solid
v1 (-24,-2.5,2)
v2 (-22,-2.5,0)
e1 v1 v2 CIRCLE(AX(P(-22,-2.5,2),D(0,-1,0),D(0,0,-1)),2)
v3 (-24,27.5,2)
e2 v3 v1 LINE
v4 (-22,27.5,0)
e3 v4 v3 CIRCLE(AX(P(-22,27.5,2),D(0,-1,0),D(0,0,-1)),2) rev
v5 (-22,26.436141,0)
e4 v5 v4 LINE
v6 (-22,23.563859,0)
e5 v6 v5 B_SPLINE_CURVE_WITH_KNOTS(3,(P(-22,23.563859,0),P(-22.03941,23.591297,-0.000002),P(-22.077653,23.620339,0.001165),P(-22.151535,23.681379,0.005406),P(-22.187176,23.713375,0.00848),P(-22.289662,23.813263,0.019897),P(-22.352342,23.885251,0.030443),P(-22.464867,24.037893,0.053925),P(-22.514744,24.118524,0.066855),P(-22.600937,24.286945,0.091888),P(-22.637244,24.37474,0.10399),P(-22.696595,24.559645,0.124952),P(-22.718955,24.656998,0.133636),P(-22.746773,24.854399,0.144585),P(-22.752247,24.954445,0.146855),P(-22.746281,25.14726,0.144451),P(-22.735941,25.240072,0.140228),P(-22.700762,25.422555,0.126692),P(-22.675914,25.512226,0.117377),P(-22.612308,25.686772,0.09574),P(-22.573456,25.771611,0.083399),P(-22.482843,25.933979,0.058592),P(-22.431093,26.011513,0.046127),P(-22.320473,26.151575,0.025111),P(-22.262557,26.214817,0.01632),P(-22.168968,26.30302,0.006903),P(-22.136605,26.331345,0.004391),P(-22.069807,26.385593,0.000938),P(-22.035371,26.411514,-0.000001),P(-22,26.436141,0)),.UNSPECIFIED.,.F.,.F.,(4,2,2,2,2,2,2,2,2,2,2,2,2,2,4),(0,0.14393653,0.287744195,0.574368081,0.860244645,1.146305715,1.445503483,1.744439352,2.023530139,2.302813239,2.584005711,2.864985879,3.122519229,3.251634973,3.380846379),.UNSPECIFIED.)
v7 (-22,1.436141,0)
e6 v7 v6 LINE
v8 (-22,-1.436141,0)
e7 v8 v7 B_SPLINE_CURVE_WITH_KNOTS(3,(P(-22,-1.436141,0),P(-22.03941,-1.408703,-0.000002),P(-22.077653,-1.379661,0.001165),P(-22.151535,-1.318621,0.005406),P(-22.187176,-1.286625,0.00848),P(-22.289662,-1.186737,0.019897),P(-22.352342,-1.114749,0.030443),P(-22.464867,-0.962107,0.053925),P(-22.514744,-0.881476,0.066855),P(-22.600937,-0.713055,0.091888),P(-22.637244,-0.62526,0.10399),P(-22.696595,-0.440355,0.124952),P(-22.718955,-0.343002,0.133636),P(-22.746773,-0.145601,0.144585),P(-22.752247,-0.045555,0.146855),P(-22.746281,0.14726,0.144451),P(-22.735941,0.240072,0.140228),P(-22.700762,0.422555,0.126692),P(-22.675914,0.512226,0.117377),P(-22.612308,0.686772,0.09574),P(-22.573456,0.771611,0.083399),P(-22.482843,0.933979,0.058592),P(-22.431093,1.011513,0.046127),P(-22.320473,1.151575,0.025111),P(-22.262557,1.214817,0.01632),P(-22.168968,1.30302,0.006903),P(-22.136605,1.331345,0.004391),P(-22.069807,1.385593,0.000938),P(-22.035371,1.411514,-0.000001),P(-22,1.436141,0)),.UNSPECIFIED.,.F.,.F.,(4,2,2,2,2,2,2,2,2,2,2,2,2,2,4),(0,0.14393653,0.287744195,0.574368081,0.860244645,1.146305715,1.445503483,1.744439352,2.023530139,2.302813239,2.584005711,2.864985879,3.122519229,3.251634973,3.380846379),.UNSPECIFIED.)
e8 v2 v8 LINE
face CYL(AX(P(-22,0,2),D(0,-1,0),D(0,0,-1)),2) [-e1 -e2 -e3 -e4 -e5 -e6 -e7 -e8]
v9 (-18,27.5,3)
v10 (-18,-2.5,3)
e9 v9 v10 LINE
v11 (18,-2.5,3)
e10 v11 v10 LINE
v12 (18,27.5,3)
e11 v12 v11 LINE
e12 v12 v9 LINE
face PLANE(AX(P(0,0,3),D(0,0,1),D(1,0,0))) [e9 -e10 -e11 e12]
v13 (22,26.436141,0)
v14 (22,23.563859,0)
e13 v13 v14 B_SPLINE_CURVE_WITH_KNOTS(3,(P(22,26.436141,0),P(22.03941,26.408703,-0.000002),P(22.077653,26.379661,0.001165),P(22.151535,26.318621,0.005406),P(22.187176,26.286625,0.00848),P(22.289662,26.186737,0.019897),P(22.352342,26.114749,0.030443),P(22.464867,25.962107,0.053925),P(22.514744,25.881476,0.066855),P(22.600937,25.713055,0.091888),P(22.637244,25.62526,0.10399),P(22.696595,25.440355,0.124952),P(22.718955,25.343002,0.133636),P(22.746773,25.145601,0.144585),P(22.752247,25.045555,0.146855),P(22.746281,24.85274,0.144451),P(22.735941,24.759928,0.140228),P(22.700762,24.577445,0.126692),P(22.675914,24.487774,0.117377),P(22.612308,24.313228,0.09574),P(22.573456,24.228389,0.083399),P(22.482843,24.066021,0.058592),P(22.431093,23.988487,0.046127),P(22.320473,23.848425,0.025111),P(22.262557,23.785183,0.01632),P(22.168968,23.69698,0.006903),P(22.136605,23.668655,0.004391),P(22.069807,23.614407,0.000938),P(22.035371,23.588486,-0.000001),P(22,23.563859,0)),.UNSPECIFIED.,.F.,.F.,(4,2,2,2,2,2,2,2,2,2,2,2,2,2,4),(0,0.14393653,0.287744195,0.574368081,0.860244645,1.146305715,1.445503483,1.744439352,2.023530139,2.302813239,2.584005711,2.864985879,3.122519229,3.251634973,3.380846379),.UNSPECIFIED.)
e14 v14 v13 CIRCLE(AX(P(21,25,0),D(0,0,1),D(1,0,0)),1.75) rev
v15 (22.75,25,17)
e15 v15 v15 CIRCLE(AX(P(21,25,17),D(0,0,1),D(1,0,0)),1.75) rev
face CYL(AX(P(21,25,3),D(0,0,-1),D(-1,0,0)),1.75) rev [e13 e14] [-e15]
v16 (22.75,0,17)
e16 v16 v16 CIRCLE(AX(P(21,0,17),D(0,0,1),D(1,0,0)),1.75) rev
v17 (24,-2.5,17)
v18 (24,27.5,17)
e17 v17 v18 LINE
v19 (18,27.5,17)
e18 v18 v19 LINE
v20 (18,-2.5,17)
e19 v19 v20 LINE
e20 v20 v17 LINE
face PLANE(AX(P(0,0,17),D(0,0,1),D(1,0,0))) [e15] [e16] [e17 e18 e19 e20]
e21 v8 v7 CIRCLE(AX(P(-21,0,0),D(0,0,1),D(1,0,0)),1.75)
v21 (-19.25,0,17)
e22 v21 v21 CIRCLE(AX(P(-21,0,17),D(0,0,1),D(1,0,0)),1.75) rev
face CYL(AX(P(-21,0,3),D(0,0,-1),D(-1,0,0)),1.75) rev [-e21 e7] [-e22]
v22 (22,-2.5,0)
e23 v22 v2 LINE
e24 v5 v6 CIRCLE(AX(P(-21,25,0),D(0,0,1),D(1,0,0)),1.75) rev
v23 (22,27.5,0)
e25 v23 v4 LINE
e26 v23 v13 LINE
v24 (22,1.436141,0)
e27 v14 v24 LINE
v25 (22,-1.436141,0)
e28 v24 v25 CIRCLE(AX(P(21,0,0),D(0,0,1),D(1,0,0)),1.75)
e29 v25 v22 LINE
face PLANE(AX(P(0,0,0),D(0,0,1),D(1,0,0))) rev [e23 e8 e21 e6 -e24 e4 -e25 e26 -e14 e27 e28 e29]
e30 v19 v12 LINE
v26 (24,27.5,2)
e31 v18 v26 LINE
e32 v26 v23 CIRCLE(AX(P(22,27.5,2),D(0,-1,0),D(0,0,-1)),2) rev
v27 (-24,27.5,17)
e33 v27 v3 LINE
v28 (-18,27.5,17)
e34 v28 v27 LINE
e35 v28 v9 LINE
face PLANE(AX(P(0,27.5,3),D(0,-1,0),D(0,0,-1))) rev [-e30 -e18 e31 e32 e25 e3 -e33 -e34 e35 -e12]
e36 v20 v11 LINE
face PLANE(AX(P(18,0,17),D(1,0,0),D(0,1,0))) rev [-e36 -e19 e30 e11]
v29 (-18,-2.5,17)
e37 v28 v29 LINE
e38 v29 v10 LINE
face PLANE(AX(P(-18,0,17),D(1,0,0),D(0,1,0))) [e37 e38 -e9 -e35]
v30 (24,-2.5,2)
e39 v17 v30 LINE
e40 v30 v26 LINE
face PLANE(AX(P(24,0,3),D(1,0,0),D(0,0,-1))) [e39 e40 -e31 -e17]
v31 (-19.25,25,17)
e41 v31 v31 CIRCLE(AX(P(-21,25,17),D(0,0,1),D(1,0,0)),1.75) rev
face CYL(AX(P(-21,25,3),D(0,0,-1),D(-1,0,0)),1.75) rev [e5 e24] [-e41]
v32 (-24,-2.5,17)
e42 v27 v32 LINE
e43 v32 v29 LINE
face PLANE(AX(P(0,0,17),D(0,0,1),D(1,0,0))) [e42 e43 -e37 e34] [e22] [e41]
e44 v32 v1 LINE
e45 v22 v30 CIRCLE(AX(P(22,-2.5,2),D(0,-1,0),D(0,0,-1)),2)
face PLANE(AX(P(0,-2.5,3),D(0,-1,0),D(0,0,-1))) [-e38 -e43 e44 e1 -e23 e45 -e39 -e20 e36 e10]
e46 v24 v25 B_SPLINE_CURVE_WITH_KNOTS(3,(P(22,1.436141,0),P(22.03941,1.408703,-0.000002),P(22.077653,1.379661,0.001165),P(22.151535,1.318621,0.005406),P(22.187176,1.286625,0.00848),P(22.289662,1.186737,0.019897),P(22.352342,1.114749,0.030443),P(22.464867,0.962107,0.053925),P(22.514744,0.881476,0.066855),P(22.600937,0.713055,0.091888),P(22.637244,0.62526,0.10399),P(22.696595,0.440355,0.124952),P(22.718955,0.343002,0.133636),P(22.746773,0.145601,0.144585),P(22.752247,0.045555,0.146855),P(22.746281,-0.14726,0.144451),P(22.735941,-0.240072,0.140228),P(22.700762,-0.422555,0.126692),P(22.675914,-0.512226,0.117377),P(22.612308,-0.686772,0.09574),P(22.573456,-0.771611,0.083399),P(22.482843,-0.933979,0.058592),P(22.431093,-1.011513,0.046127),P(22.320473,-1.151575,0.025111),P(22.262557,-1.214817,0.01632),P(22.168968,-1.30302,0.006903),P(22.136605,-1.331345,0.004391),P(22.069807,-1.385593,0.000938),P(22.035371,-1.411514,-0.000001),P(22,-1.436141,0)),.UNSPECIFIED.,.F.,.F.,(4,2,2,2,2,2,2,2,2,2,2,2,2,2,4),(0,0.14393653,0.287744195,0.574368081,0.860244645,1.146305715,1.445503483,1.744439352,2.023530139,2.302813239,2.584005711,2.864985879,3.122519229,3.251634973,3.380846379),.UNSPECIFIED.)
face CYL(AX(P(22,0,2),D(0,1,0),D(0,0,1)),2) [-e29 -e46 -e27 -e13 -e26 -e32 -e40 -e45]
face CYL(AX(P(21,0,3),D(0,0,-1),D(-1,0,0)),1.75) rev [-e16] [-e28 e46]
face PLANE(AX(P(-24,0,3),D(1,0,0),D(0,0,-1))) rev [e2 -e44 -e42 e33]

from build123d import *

# Parameters (mm, degrees)
CROQUIS1_R              = 1.75
SALIENTE_EXTRUIR1_DEPTH = 3
CROQUIS3_W              = 6
CROQUIS3_H              = 30
CROQUIS3_R              = 1.75
SALIENTE_EXTRUIR4_DEPTH = 14
REDONDEO1_R             = 2


with BuildPart() as part:
    # Croquis1 → Saliente-Extruir1 (new body)
    # profile 1 of 2: a face of its own
    with BuildSketch(Plane.XY):
        Polygon((-24, 12.5), (24, 12.5), (24, 22.5), (24, 27.5), (-24, 27.5), (-24, 22.5), align=None)
        with Locations((-21, 25)):
            Circle(CROQUIS1_R, mode=Mode.SUBTRACT)
        with Locations((21, 25)):
            Circle(CROQUIS1_R, mode=Mode.SUBTRACT)
    # profile 2 of 2: a face of its own
    with BuildSketch(Plane.XY):
        Polygon((-24, -2.5), (24, -2.5), (24, 2.5), (24, 12.5), (-24, 12.5), (-24, 2.5), align=None)
        with Locations((-21, 0)):
            Circle(CROQUIS1_R, mode=Mode.SUBTRACT)
        with Locations((21, 0)):
            Circle(CROQUIS1_R, mode=Mode.SUBTRACT)
    extrude(amount=SALIENTE_EXTRUIR1_DEPTH)

    # Croquis3 → Saliente-Extruir4 (add)
    # profile 1 of 2: a face of its own
    with BuildSketch(Plane.XY.offset(3)):
        with Locations((-21, 12.5)):
            Rectangle(CROQUIS3_W, CROQUIS3_H)
        with Locations((-21, 0)):
            Circle(CROQUIS3_R, mode=Mode.SUBTRACT)
        with Locations((-21, 25)):
            Circle(CROQUIS3_R, mode=Mode.SUBTRACT)
    # profile 2 of 2: a face of its own
    with BuildSketch(Plane.XY.offset(3)):
        with Locations((21, 12.5)):
            Rectangle(CROQUIS3_W, CROQUIS3_H)
        with Locations((21, 0)):
            Circle(CROQUIS3_R, mode=Mode.SUBTRACT)
        with Locations((21, 25)):
            Circle(CROQUIS3_R, mode=Mode.SUBTRACT)
    extrude(amount=SALIENTE_EXTRUIR4_DEPTH)

    # Redondeo1
    # the kernel refuses this fillet: 2 mm, written as the material it takes off along each edge
    with BuildSketch(Plane(origin=(-24, 32.5, 0), x_dir=(1, 0, 0), z_dir=(0, -1, 0)), Plane(origin=(24, -7.5, 0), x_dir=(-1, 0, 0), z_dir=(0, 1, 0))) as redondeo1_piece_1:
        with BuildLine():
            CenterArc((REDONDEO1_R, REDONDEO1_R), REDONDEO1_R, 180, 90)
            Line((0, REDONDEO1_R), (0, 0))
            Line((0, 0), (REDONDEO1_R, 0))
        make_face()
    extrude(amount=40, mode=Mode.SUBTRACT)


solid = part.part
